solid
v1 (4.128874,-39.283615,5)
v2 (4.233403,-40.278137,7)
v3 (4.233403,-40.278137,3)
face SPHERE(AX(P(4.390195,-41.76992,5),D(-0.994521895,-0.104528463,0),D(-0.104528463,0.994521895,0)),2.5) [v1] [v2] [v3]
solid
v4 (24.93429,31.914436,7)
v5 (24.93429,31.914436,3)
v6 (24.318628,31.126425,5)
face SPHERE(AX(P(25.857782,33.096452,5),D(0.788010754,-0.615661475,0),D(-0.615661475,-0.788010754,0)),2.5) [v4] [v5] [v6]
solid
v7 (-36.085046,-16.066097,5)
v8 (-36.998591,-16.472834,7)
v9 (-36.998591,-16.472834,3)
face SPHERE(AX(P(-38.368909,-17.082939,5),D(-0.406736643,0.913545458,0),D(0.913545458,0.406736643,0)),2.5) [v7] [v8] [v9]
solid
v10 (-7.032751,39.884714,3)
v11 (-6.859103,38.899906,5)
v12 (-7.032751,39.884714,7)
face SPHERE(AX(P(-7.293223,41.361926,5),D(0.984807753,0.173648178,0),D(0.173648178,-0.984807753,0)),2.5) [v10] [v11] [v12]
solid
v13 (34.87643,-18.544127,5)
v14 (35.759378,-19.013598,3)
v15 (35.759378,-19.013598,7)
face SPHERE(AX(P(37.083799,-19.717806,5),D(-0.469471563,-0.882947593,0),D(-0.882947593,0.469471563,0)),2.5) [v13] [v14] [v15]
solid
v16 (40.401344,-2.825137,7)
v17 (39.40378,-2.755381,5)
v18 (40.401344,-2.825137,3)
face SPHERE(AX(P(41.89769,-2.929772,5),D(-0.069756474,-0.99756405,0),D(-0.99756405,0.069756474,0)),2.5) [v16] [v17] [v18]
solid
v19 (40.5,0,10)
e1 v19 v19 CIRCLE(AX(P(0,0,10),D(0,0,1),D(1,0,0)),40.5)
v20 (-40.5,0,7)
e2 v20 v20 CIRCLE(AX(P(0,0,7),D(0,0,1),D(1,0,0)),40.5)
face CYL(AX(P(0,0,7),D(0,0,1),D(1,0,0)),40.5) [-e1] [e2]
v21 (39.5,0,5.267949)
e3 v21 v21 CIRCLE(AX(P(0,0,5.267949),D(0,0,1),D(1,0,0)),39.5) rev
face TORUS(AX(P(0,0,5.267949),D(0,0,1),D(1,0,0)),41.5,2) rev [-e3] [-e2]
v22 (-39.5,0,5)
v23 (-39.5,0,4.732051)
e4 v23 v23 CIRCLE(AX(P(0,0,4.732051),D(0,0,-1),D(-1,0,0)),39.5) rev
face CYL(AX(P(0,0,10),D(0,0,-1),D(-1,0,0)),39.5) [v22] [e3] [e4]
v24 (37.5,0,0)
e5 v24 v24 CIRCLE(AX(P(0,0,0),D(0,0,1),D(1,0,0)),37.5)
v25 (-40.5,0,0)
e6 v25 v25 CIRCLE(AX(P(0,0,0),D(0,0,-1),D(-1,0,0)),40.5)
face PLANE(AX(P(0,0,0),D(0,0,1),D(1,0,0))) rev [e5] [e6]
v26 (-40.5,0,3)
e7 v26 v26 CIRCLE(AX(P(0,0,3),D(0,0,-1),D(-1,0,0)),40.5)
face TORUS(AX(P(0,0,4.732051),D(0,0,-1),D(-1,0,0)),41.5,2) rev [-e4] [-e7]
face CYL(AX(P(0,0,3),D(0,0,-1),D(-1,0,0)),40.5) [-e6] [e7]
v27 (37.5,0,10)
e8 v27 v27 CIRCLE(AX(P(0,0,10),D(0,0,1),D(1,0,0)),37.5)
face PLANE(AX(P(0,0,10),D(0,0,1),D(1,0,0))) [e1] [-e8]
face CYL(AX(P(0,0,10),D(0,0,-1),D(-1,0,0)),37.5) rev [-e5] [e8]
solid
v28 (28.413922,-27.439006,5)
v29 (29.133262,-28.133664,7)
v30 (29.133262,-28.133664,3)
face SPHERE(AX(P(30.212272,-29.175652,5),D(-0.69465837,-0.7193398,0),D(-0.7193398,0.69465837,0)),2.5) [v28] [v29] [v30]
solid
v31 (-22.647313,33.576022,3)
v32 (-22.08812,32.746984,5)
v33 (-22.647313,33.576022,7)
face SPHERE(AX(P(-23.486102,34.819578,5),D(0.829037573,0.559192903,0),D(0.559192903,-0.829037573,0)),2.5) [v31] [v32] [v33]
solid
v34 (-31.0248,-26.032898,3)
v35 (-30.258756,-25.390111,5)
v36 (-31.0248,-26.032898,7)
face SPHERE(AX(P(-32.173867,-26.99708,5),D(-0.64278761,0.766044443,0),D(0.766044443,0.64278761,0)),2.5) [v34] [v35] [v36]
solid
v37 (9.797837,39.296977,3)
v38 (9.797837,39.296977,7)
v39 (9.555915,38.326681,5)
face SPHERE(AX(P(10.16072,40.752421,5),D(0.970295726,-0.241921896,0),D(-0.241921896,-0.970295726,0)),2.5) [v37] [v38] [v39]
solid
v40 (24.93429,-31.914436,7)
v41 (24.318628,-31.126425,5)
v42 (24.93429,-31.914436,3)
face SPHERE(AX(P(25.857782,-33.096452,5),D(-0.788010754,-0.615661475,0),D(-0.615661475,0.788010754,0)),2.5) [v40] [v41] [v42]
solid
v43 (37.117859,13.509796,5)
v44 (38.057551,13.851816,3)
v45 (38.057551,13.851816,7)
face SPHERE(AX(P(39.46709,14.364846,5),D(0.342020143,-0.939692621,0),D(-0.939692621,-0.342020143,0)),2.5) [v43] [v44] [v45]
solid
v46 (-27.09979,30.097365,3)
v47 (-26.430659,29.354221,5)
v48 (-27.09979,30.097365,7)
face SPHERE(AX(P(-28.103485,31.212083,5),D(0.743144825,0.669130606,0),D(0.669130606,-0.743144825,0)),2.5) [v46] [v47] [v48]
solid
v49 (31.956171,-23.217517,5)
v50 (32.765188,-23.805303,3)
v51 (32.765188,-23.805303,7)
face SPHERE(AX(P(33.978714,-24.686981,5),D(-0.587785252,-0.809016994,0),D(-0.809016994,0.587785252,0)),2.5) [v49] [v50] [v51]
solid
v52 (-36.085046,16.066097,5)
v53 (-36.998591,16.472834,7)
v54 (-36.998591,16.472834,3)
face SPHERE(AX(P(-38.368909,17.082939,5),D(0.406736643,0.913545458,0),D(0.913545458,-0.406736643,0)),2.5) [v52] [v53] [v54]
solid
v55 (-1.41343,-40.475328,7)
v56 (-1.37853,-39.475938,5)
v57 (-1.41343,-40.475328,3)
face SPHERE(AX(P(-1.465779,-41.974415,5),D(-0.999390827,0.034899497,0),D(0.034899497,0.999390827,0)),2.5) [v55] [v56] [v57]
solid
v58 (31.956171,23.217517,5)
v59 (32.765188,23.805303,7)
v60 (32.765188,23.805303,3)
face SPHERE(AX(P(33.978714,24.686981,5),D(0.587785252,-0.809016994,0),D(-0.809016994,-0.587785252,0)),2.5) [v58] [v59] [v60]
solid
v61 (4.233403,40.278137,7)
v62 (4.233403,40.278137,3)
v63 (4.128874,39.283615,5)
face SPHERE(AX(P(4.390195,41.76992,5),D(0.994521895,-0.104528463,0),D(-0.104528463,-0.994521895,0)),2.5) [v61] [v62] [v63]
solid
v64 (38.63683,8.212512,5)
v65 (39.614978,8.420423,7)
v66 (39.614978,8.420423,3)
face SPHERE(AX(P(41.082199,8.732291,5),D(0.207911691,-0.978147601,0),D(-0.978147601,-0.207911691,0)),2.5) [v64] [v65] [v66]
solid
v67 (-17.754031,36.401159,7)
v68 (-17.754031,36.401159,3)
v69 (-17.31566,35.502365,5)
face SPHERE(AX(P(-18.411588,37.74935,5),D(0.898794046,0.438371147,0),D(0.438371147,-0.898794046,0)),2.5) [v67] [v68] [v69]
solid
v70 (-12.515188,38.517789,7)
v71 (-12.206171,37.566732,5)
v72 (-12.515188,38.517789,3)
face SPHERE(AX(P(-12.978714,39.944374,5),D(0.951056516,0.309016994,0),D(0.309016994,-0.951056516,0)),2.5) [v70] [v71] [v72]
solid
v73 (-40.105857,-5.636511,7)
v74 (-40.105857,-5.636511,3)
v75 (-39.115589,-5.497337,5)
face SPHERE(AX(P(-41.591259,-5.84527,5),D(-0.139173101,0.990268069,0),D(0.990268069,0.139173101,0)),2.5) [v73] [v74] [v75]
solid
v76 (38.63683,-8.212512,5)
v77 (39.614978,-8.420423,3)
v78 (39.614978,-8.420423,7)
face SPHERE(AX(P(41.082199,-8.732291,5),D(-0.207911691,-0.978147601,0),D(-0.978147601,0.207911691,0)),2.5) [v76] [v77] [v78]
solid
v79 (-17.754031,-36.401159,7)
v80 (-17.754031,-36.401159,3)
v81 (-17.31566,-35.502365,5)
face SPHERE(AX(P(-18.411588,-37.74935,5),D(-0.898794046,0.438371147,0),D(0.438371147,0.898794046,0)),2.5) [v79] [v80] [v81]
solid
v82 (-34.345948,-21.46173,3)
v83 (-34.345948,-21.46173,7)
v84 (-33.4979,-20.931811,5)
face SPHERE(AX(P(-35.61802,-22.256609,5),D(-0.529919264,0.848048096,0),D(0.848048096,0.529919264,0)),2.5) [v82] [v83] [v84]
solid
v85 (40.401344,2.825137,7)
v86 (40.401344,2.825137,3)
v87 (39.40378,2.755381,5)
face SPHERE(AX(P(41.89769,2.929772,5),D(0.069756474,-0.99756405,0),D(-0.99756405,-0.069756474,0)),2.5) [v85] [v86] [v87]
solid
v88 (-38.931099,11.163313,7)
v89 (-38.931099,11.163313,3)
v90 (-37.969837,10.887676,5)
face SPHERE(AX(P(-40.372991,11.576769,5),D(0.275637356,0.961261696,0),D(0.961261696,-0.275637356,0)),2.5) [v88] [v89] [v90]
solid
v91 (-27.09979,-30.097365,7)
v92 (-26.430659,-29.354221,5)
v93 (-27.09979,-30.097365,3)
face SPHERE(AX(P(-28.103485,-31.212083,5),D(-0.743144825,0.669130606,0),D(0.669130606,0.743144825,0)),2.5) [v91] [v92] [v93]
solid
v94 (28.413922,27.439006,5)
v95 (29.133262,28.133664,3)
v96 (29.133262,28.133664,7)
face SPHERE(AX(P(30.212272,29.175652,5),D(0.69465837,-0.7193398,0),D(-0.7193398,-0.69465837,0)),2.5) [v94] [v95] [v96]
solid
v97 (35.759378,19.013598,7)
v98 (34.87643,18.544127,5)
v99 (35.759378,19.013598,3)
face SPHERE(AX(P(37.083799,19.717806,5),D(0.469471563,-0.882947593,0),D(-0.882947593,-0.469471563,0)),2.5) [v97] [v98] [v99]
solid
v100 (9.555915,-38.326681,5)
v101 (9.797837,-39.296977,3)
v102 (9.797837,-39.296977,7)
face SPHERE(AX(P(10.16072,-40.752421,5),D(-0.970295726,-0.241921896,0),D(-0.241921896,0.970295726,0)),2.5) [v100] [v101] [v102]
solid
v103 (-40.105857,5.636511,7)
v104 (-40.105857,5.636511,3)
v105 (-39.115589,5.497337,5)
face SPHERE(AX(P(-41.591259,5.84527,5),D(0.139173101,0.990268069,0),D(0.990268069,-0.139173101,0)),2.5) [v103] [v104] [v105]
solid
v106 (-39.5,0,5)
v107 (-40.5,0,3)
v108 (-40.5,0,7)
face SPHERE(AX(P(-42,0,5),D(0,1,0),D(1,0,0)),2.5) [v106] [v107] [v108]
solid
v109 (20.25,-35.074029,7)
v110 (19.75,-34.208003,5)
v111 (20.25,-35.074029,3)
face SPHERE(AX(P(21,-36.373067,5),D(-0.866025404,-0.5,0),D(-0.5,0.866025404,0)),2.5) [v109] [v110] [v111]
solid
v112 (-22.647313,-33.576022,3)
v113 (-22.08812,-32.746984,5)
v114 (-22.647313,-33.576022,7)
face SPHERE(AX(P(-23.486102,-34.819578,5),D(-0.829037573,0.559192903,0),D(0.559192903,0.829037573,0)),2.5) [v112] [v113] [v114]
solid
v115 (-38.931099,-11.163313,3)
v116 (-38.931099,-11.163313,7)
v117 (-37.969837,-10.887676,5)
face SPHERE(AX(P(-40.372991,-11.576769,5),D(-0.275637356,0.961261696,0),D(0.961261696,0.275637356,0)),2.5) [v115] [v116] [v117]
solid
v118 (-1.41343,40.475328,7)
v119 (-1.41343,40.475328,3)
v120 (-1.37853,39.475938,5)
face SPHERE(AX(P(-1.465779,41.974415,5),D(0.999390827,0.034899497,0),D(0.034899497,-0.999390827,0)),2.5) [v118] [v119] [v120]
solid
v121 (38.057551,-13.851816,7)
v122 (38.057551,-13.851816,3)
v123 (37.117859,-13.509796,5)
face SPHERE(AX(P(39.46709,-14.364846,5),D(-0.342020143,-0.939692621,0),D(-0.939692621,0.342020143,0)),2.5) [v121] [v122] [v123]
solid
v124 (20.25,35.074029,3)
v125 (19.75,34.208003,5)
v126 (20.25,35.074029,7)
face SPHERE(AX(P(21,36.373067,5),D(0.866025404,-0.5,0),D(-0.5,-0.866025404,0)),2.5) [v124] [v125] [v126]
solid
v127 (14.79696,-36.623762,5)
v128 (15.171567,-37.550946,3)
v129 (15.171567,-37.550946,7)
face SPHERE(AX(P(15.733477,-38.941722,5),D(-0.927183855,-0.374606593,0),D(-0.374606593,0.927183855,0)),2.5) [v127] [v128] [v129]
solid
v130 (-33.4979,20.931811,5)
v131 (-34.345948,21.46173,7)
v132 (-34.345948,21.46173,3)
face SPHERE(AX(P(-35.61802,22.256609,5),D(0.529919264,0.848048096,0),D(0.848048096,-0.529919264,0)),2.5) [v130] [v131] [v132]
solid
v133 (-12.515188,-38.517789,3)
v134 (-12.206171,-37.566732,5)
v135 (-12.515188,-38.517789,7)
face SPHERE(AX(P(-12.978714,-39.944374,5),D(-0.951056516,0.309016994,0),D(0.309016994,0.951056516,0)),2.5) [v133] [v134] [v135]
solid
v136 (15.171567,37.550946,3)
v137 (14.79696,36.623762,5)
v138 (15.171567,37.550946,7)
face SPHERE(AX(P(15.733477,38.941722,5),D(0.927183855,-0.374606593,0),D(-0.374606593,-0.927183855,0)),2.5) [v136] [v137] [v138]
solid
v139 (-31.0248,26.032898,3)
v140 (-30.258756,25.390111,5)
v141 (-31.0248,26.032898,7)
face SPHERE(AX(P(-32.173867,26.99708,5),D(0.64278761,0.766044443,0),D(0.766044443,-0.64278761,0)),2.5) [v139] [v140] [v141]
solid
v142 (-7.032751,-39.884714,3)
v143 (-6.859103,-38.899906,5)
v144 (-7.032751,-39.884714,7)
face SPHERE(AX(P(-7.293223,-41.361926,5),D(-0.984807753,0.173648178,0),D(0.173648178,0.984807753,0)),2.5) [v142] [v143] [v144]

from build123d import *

# Parameters (mm, degrees)
SKETCH_1_R               = 39.5
SKETCH_1_R_2             = 37.5
EXTRUDE_4_DEPTH          = 10
EXTRUDE_START            = -3
SKETCH_5_R               = 40.5
SKETCH_5_R_2             = 39.5
EXTRUDE_5_DEPTH          = 3
FILLET_1_R               = 2
SKETCH_6_R               = 40.5
SKETCH_6_R_2             = 39.5
EXTRUDE_9_DEPTH          = 3
FILLET_2_R               = 2
PATTERN_CIRCULAR_1_COUNT = 45


with BuildPart() as part:
    # 草图1 → 凸台-拉伸4 (new body)
    with BuildSketch(Plane.XY):
        Circle(SKETCH_1_R)
        Circle(SKETCH_1_R_2, mode=Mode.SUBTRACT)
    extrude(amount=EXTRUDE_4_DEPTH)

    # 草图5 → 凸台-拉伸5 (add)
    with BuildSketch(Plane.XY.offset(10).offset(EXTRUDE_START)):
        Circle(SKETCH_5_R)
        Circle(SKETCH_5_R_2, mode=Mode.SUBTRACT)
    extrude(amount=EXTRUDE_5_DEPTH)

    # 圆角1
    # the kernel refuses this fillet: 2 mm, written as the material it adds along each edge
    with BuildSketch(Plane(origin=(0, 0, 7), x_dir=(1, 0, 0), z_dir=(0, -1, 0))) as fillet_1_piece_1:
        with BuildLine():
            CenterArc((41.5, -1.732050808), FILLET_1_R, 120, 60)
            Line((40.5, 0), (40.48, 0.034641016))
            ThreePointArc((40.48, 0.034641016), (40, 0.04), (39.5, 0.04))
            Line((39.5, 0.04), (39.46, 0))
            Line((39.46, 0), (39.46, -1.732050808))
            Line((39.46, -1.732050808), (39.5, -1.732050808))
        make_face()
    revolve(axis=Axis((0, 0, 7), (0, 0, 1)))

    # 草图6 → 凸台-拉伸9 (add)
    with BuildSketch(Plane(origin=(0, 0, 0), x_dir=(-1, 0, 0), z_dir=(0, 0, -1))):
        with Locations(Location((0, 0, 0), (0, 0, 180))):
            Circle(SKETCH_6_R)
        Circle(SKETCH_6_R_2, mode=Mode.SUBTRACT)
    extrude(amount=-EXTRUDE_9_DEPTH)

    # 圆角2
    # the kernel refuses this fillet: 2 mm, written as the material it adds along each edge
    with BuildSketch(Plane(origin=(0, 0, 3), x_dir=(1, 0, 0), z_dir=(0, -1, 0))) as fillet_2_piece_1:
        with BuildLine():
            CenterArc((41.5, 1.732050808), FILLET_2_R, 180, 60)
            Line((39.5, 1.732050808), (39.46, 1.732050808))
            Line((39.46, 1.732050808), (39.46, 0))
            Line((39.46, 0), (39.5, -0.04))
            ThreePointArc((39.5, -0.04), (40, -0.04), (40.48, -0.034641016))
            Line((40.48, -0.034641016), (40.5, 0))
        make_face()
    revolve(axis=Axis((0, 0, 3), (0, 0, 1)))


with BuildPart() as body_2:
    # 草图4 → 旋转1 (revolve)
    with BuildSketch(Plane.XY.offset(5)):
        with BuildLine():
            Line((-42, 2.5), (-42, -2.5))
            ThreePointArc((-42, -2.5), (-39.5, 0), (-42, 2.5))
        make_face()
    revolve(axis=Axis((-42, 2.5, 5), (0, -1, 0)))


with BuildPart() as pattern_circular_1_1:
    # 阵列(圆周)1: pattern copy
    add(body_2.part.rotate(Axis((0, 0, 0), (0, 0, 1)), 1 * 360 / PATTERN_CIRCULAR_1_COUNT))


with BuildPart() as pattern_circular_1_2:
    # 阵列(圆周)1: pattern copy
    add(body_2.part.rotate(Axis((0, 0, 0), (0, 0, 1)), 2 * 360 / PATTERN_CIRCULAR_1_COUNT))


with BuildPart() as pattern_circular_1_3:
    # 阵列(圆周)1: pattern copy
    add(body_2.part.rotate(Axis((0, 0, 0), (0, 0, 1)), 3 * 360 / PATTERN_CIRCULAR_1_COUNT))


with BuildPart() as pattern_circular_1_4:
    # 阵列(圆周)1: pattern copy
    add(body_2.part.rotate(Axis((0, 0, 0), (0, 0, 1)), 4 * 360 / PATTERN_CIRCULAR_1_COUNT))


with BuildPart() as pattern_circular_1_5:
    # 阵列(圆周)1: pattern copy
    add(body_2.part.rotate(Axis((0, 0, 0), (0, 0, 1)), 5 * 360 / PATTERN_CIRCULAR_1_COUNT))


with BuildPart() as pattern_circular_1_6:
    # 阵列(圆周)1: pattern copy
    add(body_2.part.rotate(Axis((0, 0, 0), (0, 0, 1)), 6 * 360 / PATTERN_CIRCULAR_1_COUNT))


with BuildPart() as pattern_circular_1_7:
    # 阵列(圆周)1: pattern copy
    add(body_2.part.rotate(Axis((0, 0, 0), (0, 0, 1)), 7 * 360 / PATTERN_CIRCULAR_1_COUNT))


with BuildPart() as pattern_circular_1_8:
    # 阵列(圆周)1: pattern copy
    add(body_2.part.rotate(Axis((0, 0, 0), (0, 0, 1)), 8 * 360 / PATTERN_CIRCULAR_1_COUNT))


with BuildPart() as pattern_circular_1_9:
    # 阵列(圆周)1: pattern copy
    add(body_2.part.rotate(Axis((0, 0, 0), (0, 0, 1)), 9 * 360 / PATTERN_CIRCULAR_1_COUNT))


with BuildPart() as pattern_circular_1_10:
    # 阵列(圆周)1: pattern copy
    add(body_2.part.rotate(Axis((0, 0, 0), (0, 0, 1)), 10 * 360 / PATTERN_CIRCULAR_1_COUNT))


with BuildPart() as pattern_circular_1_11:
    # 阵列(圆周)1: pattern copy
    add(body_2.part.rotate(Axis((0, 0, 0), (0, 0, 1)), 11 * 360 / PATTERN_CIRCULAR_1_COUNT))


with BuildPart() as pattern_circular_1_12:
    # 阵列(圆周)1: pattern copy
    add(body_2.part.rotate(Axis((0, 0, 0), (0, 0, 1)), 12 * 360 / PATTERN_CIRCULAR_1_COUNT))


with BuildPart() as pattern_circular_1_13:
    # 阵列(圆周)1: pattern copy
    add(body_2.part.rotate(Axis((0, 0, 0), (0, 0, 1)), 13 * 360 / PATTERN_CIRCULAR_1_COUNT))


with BuildPart() as pattern_circular_1_14:
    # 阵列(圆周)1: pattern copy
    add(body_2.part.rotate(Axis((0, 0, 0), (0, 0, 1)), 14 * 360 / PATTERN_CIRCULAR_1_COUNT))


with BuildPart() as pattern_circular_1_15:
    # 阵列(圆周)1: pattern copy
    add(body_2.part.rotate(Axis((0, 0, 0), (0, 0, 1)), 15 * 360 / PATTERN_CIRCULAR_1_COUNT))


with BuildPart() as pattern_circular_1_16:
    # 阵列(圆周)1: pattern copy
    add(body_2.part.rotate(Axis((0, 0, 0), (0, 0, 1)), 16 * 360 / PATTERN_CIRCULAR_1_COUNT))


with BuildPart() as pattern_circular_1_17:
    # 阵列(圆周)1: pattern copy
    add(body_2.part.rotate(Axis((0, 0, 0), (0, 0, 1)), 17 * 360 / PATTERN_CIRCULAR_1_COUNT))


with BuildPart() as pattern_circular_1_18:
    # 阵列(圆周)1: pattern copy
    add(body_2.part.rotate(Axis((0, 0, 0), (0, 0, 1)), 18 * 360 / PATTERN_CIRCULAR_1_COUNT))


with BuildPart() as pattern_circular_1_19:
    # 阵列(圆周)1: pattern copy
    add(body_2.part.rotate(Axis((0, 0, 0), (0, 0, 1)), 19 * 360 / PATTERN_CIRCULAR_1_COUNT))


with BuildPart() as pattern_circular_1_20:
    # 阵列(圆周)1: pattern copy
    add(body_2.part.rotate(Axis((0, 0, 0), (0, 0, 1)), 20 * 360 / PATTERN_CIRCULAR_1_COUNT))


with BuildPart() as pattern_circular_1_21:
    # 阵列(圆周)1: pattern copy
    add(body_2.part.rotate(Axis((0, 0, 0), (0, 0, 1)), 21 * 360 / PATTERN_CIRCULAR_1_COUNT))


with BuildPart() as pattern_circular_1_22:
    # 阵列(圆周)1: pattern copy
    add(body_2.part.rotate(Axis((0, 0, 0), (0, 0, 1)), 22 * 360 / PATTERN_CIRCULAR_1_COUNT))


with BuildPart() as pattern_circular_1_23:
    # 阵列(圆周)1: pattern copy
    add(body_2.part.rotate(Axis((0, 0, 0), (0, 0, 1)), 23 * 360 / PATTERN_CIRCULAR_1_COUNT))


with BuildPart() as pattern_circular_1_24:
    # 阵列(圆周)1: pattern copy
    add(body_2.part.rotate(Axis((0, 0, 0), (0, 0, 1)), 24 * 360 / PATTERN_CIRCULAR_1_COUNT))


with BuildPart() as pattern_circular_1_25:
    # 阵列(圆周)1: pattern copy
    add(body_2.part.rotate(Axis((0, 0, 0), (0, 0, 1)), 25 * 360 / PATTERN_CIRCULAR_1_COUNT))


with BuildPart() as pattern_circular_1_26:
    # 阵列(圆周)1: pattern copy
    add(body_2.part.rotate(Axis((0, 0, 0), (0, 0, 1)), 26 * 360 / PATTERN_CIRCULAR_1_COUNT))


with BuildPart() as pattern_circular_1_27:
    # 阵列(圆周)1: pattern copy
    add(body_2.part.rotate(Axis((0, 0, 0), (0, 0, 1)), 27 * 360 / PATTERN_CIRCULAR_1_COUNT))


with BuildPart() as pattern_circular_1_28:
    # 阵列(圆周)1: pattern copy
    add(body_2.part.rotate(Axis((0, 0, 0), (0, 0, 1)), 28 * 360 / PATTERN_CIRCULAR_1_COUNT))


with BuildPart() as pattern_circular_1_29:
    # 阵列(圆周)1: pattern copy
    add(body_2.part.rotate(Axis((0, 0, 0), (0, 0, 1)), 29 * 360 / PATTERN_CIRCULAR_1_COUNT))


with BuildPart() as pattern_circular_1_30:
    # 阵列(圆周)1: pattern copy
    add(body_2.part.rotate(Axis((0, 0, 0), (0, 0, 1)), 30 * 360 / PATTERN_CIRCULAR_1_COUNT))


with BuildPart() as pattern_circular_1_31:
    # 阵列(圆周)1: pattern copy
    add(body_2.part.rotate(Axis((0, 0, 0), (0, 0, 1)), 31 * 360 / PATTERN_CIRCULAR_1_COUNT))


with BuildPart() as pattern_circular_1_32:
    # 阵列(圆周)1: pattern copy
    add(body_2.part.rotate(Axis((0, 0, 0), (0, 0, 1)), 32 * 360 / PATTERN_CIRCULAR_1_COUNT))


with BuildPart() as pattern_circular_1_33:
    # 阵列(圆周)1: pattern copy
    add(body_2.part.rotate(Axis((0, 0, 0), (0, 0, 1)), 33 * 360 / PATTERN_CIRCULAR_1_COUNT))


with BuildPart() as pattern_circular_1_34:
    # 阵列(圆周)1: pattern copy
    add(body_2.part.rotate(Axis((0, 0, 0), (0, 0, 1)), 34 * 360 / PATTERN_CIRCULAR_1_COUNT))


with BuildPart() as pattern_circular_1_35:
    # 阵列(圆周)1: pattern copy
    add(body_2.part.rotate(Axis((0, 0, 0), (0, 0, 1)), 35 * 360 / PATTERN_CIRCULAR_1_COUNT))


with BuildPart() as pattern_circular_1_36:
    # 阵列(圆周)1: pattern copy
    add(body_2.part.rotate(Axis((0, 0, 0), (0, 0, 1)), 36 * 360 / PATTERN_CIRCULAR_1_COUNT))


with BuildPart() as pattern_circular_1_37:
    # 阵列(圆周)1: pattern copy
    add(body_2.part.rotate(Axis((0, 0, 0), (0, 0, 1)), 37 * 360 / PATTERN_CIRCULAR_1_COUNT))


with BuildPart() as pattern_circular_1_38:
    # 阵列(圆周)1: pattern copy
    add(body_2.part.rotate(Axis((0, 0, 0), (0, 0, 1)), 38 * 360 / PATTERN_CIRCULAR_1_COUNT))


with BuildPart() as pattern_circular_1_39:
    # 阵列(圆周)1: pattern copy
    add(body_2.part.rotate(Axis((0, 0, 0), (0, 0, 1)), 39 * 360 / PATTERN_CIRCULAR_1_COUNT))


with BuildPart() as pattern_circular_1_40:
    # 阵列(圆周)1: pattern copy
    add(body_2.part.rotate(Axis((0, 0, 0), (0, 0, 1)), 40 * 360 / PATTERN_CIRCULAR_1_COUNT))


with BuildPart() as pattern_circular_1_41:
    # 阵列(圆周)1: pattern copy
    add(body_2.part.rotate(Axis((0, 0, 0), (0, 0, 1)), 41 * 360 / PATTERN_CIRCULAR_1_COUNT))


with BuildPart() as pattern_circular_1_42:
    # 阵列(圆周)1: pattern copy
    add(body_2.part.rotate(Axis((0, 0, 0), (0, 0, 1)), 42 * 360 / PATTERN_CIRCULAR_1_COUNT))


with BuildPart() as pattern_circular_1_43:
    # 阵列(圆周)1: pattern copy
    add(body_2.part.rotate(Axis((0, 0, 0), (0, 0, 1)), 43 * 360 / PATTERN_CIRCULAR_1_COUNT))


with BuildPart() as pattern_circular_1_44:
    # 阵列(圆周)1: pattern copy
    add(body_2.part.rotate(Axis((0, 0, 0), (0, 0, 1)), 44 * 360 / PATTERN_CIRCULAR_1_COUNT))


solid = Compound([part.part, body_2.part, pattern_circular_1_1.part, pattern_circular_1_2.part, pattern_circular_1_3.part, pattern_circular_1_4.part, pattern_circular_1_5.part, pattern_circular_1_6.part, pattern_circular_1_7.part, pattern_circular_1_8.part, pattern_circular_1_9.part, pattern_circular_1_10.part, pattern_circular_1_11.part, pattern_circular_1_12.part, pattern_circular_1_13.part, pattern_circular_1_14.part, pattern_circular_1_15.part, pattern_circular_1_16.part, pattern_circular_1_17.part, pattern_circular_1_18.part, pattern_circular_1_19.part, pattern_circular_1_20.part, pattern_circular_1_21.part, pattern_circular_1_22.part, pattern_circular_1_23.part, pattern_circular_1_24.part, pattern_circular_1_25.part, pattern_circular_1_26.part, pattern_circular_1_27.part, pattern_circular_1_28.part, pattern_circular_1_29.part, pattern_circular_1_30.part, pattern_circular_1_31.part, pattern_circular_1_32.part, pattern_circular_1_33.part, pattern_circular_1_34.part, pattern_circular_1_35.part, pattern_circular_1_36.part, pattern_circular_1_37.part, pattern_circular_1_38.part, pattern_circular_1_39.part, pattern_circular_1_40.part, pattern_circular_1_41.part, pattern_circular_1_42.part, pattern_circular_1_43.part, pattern_circular_1_44.part])
